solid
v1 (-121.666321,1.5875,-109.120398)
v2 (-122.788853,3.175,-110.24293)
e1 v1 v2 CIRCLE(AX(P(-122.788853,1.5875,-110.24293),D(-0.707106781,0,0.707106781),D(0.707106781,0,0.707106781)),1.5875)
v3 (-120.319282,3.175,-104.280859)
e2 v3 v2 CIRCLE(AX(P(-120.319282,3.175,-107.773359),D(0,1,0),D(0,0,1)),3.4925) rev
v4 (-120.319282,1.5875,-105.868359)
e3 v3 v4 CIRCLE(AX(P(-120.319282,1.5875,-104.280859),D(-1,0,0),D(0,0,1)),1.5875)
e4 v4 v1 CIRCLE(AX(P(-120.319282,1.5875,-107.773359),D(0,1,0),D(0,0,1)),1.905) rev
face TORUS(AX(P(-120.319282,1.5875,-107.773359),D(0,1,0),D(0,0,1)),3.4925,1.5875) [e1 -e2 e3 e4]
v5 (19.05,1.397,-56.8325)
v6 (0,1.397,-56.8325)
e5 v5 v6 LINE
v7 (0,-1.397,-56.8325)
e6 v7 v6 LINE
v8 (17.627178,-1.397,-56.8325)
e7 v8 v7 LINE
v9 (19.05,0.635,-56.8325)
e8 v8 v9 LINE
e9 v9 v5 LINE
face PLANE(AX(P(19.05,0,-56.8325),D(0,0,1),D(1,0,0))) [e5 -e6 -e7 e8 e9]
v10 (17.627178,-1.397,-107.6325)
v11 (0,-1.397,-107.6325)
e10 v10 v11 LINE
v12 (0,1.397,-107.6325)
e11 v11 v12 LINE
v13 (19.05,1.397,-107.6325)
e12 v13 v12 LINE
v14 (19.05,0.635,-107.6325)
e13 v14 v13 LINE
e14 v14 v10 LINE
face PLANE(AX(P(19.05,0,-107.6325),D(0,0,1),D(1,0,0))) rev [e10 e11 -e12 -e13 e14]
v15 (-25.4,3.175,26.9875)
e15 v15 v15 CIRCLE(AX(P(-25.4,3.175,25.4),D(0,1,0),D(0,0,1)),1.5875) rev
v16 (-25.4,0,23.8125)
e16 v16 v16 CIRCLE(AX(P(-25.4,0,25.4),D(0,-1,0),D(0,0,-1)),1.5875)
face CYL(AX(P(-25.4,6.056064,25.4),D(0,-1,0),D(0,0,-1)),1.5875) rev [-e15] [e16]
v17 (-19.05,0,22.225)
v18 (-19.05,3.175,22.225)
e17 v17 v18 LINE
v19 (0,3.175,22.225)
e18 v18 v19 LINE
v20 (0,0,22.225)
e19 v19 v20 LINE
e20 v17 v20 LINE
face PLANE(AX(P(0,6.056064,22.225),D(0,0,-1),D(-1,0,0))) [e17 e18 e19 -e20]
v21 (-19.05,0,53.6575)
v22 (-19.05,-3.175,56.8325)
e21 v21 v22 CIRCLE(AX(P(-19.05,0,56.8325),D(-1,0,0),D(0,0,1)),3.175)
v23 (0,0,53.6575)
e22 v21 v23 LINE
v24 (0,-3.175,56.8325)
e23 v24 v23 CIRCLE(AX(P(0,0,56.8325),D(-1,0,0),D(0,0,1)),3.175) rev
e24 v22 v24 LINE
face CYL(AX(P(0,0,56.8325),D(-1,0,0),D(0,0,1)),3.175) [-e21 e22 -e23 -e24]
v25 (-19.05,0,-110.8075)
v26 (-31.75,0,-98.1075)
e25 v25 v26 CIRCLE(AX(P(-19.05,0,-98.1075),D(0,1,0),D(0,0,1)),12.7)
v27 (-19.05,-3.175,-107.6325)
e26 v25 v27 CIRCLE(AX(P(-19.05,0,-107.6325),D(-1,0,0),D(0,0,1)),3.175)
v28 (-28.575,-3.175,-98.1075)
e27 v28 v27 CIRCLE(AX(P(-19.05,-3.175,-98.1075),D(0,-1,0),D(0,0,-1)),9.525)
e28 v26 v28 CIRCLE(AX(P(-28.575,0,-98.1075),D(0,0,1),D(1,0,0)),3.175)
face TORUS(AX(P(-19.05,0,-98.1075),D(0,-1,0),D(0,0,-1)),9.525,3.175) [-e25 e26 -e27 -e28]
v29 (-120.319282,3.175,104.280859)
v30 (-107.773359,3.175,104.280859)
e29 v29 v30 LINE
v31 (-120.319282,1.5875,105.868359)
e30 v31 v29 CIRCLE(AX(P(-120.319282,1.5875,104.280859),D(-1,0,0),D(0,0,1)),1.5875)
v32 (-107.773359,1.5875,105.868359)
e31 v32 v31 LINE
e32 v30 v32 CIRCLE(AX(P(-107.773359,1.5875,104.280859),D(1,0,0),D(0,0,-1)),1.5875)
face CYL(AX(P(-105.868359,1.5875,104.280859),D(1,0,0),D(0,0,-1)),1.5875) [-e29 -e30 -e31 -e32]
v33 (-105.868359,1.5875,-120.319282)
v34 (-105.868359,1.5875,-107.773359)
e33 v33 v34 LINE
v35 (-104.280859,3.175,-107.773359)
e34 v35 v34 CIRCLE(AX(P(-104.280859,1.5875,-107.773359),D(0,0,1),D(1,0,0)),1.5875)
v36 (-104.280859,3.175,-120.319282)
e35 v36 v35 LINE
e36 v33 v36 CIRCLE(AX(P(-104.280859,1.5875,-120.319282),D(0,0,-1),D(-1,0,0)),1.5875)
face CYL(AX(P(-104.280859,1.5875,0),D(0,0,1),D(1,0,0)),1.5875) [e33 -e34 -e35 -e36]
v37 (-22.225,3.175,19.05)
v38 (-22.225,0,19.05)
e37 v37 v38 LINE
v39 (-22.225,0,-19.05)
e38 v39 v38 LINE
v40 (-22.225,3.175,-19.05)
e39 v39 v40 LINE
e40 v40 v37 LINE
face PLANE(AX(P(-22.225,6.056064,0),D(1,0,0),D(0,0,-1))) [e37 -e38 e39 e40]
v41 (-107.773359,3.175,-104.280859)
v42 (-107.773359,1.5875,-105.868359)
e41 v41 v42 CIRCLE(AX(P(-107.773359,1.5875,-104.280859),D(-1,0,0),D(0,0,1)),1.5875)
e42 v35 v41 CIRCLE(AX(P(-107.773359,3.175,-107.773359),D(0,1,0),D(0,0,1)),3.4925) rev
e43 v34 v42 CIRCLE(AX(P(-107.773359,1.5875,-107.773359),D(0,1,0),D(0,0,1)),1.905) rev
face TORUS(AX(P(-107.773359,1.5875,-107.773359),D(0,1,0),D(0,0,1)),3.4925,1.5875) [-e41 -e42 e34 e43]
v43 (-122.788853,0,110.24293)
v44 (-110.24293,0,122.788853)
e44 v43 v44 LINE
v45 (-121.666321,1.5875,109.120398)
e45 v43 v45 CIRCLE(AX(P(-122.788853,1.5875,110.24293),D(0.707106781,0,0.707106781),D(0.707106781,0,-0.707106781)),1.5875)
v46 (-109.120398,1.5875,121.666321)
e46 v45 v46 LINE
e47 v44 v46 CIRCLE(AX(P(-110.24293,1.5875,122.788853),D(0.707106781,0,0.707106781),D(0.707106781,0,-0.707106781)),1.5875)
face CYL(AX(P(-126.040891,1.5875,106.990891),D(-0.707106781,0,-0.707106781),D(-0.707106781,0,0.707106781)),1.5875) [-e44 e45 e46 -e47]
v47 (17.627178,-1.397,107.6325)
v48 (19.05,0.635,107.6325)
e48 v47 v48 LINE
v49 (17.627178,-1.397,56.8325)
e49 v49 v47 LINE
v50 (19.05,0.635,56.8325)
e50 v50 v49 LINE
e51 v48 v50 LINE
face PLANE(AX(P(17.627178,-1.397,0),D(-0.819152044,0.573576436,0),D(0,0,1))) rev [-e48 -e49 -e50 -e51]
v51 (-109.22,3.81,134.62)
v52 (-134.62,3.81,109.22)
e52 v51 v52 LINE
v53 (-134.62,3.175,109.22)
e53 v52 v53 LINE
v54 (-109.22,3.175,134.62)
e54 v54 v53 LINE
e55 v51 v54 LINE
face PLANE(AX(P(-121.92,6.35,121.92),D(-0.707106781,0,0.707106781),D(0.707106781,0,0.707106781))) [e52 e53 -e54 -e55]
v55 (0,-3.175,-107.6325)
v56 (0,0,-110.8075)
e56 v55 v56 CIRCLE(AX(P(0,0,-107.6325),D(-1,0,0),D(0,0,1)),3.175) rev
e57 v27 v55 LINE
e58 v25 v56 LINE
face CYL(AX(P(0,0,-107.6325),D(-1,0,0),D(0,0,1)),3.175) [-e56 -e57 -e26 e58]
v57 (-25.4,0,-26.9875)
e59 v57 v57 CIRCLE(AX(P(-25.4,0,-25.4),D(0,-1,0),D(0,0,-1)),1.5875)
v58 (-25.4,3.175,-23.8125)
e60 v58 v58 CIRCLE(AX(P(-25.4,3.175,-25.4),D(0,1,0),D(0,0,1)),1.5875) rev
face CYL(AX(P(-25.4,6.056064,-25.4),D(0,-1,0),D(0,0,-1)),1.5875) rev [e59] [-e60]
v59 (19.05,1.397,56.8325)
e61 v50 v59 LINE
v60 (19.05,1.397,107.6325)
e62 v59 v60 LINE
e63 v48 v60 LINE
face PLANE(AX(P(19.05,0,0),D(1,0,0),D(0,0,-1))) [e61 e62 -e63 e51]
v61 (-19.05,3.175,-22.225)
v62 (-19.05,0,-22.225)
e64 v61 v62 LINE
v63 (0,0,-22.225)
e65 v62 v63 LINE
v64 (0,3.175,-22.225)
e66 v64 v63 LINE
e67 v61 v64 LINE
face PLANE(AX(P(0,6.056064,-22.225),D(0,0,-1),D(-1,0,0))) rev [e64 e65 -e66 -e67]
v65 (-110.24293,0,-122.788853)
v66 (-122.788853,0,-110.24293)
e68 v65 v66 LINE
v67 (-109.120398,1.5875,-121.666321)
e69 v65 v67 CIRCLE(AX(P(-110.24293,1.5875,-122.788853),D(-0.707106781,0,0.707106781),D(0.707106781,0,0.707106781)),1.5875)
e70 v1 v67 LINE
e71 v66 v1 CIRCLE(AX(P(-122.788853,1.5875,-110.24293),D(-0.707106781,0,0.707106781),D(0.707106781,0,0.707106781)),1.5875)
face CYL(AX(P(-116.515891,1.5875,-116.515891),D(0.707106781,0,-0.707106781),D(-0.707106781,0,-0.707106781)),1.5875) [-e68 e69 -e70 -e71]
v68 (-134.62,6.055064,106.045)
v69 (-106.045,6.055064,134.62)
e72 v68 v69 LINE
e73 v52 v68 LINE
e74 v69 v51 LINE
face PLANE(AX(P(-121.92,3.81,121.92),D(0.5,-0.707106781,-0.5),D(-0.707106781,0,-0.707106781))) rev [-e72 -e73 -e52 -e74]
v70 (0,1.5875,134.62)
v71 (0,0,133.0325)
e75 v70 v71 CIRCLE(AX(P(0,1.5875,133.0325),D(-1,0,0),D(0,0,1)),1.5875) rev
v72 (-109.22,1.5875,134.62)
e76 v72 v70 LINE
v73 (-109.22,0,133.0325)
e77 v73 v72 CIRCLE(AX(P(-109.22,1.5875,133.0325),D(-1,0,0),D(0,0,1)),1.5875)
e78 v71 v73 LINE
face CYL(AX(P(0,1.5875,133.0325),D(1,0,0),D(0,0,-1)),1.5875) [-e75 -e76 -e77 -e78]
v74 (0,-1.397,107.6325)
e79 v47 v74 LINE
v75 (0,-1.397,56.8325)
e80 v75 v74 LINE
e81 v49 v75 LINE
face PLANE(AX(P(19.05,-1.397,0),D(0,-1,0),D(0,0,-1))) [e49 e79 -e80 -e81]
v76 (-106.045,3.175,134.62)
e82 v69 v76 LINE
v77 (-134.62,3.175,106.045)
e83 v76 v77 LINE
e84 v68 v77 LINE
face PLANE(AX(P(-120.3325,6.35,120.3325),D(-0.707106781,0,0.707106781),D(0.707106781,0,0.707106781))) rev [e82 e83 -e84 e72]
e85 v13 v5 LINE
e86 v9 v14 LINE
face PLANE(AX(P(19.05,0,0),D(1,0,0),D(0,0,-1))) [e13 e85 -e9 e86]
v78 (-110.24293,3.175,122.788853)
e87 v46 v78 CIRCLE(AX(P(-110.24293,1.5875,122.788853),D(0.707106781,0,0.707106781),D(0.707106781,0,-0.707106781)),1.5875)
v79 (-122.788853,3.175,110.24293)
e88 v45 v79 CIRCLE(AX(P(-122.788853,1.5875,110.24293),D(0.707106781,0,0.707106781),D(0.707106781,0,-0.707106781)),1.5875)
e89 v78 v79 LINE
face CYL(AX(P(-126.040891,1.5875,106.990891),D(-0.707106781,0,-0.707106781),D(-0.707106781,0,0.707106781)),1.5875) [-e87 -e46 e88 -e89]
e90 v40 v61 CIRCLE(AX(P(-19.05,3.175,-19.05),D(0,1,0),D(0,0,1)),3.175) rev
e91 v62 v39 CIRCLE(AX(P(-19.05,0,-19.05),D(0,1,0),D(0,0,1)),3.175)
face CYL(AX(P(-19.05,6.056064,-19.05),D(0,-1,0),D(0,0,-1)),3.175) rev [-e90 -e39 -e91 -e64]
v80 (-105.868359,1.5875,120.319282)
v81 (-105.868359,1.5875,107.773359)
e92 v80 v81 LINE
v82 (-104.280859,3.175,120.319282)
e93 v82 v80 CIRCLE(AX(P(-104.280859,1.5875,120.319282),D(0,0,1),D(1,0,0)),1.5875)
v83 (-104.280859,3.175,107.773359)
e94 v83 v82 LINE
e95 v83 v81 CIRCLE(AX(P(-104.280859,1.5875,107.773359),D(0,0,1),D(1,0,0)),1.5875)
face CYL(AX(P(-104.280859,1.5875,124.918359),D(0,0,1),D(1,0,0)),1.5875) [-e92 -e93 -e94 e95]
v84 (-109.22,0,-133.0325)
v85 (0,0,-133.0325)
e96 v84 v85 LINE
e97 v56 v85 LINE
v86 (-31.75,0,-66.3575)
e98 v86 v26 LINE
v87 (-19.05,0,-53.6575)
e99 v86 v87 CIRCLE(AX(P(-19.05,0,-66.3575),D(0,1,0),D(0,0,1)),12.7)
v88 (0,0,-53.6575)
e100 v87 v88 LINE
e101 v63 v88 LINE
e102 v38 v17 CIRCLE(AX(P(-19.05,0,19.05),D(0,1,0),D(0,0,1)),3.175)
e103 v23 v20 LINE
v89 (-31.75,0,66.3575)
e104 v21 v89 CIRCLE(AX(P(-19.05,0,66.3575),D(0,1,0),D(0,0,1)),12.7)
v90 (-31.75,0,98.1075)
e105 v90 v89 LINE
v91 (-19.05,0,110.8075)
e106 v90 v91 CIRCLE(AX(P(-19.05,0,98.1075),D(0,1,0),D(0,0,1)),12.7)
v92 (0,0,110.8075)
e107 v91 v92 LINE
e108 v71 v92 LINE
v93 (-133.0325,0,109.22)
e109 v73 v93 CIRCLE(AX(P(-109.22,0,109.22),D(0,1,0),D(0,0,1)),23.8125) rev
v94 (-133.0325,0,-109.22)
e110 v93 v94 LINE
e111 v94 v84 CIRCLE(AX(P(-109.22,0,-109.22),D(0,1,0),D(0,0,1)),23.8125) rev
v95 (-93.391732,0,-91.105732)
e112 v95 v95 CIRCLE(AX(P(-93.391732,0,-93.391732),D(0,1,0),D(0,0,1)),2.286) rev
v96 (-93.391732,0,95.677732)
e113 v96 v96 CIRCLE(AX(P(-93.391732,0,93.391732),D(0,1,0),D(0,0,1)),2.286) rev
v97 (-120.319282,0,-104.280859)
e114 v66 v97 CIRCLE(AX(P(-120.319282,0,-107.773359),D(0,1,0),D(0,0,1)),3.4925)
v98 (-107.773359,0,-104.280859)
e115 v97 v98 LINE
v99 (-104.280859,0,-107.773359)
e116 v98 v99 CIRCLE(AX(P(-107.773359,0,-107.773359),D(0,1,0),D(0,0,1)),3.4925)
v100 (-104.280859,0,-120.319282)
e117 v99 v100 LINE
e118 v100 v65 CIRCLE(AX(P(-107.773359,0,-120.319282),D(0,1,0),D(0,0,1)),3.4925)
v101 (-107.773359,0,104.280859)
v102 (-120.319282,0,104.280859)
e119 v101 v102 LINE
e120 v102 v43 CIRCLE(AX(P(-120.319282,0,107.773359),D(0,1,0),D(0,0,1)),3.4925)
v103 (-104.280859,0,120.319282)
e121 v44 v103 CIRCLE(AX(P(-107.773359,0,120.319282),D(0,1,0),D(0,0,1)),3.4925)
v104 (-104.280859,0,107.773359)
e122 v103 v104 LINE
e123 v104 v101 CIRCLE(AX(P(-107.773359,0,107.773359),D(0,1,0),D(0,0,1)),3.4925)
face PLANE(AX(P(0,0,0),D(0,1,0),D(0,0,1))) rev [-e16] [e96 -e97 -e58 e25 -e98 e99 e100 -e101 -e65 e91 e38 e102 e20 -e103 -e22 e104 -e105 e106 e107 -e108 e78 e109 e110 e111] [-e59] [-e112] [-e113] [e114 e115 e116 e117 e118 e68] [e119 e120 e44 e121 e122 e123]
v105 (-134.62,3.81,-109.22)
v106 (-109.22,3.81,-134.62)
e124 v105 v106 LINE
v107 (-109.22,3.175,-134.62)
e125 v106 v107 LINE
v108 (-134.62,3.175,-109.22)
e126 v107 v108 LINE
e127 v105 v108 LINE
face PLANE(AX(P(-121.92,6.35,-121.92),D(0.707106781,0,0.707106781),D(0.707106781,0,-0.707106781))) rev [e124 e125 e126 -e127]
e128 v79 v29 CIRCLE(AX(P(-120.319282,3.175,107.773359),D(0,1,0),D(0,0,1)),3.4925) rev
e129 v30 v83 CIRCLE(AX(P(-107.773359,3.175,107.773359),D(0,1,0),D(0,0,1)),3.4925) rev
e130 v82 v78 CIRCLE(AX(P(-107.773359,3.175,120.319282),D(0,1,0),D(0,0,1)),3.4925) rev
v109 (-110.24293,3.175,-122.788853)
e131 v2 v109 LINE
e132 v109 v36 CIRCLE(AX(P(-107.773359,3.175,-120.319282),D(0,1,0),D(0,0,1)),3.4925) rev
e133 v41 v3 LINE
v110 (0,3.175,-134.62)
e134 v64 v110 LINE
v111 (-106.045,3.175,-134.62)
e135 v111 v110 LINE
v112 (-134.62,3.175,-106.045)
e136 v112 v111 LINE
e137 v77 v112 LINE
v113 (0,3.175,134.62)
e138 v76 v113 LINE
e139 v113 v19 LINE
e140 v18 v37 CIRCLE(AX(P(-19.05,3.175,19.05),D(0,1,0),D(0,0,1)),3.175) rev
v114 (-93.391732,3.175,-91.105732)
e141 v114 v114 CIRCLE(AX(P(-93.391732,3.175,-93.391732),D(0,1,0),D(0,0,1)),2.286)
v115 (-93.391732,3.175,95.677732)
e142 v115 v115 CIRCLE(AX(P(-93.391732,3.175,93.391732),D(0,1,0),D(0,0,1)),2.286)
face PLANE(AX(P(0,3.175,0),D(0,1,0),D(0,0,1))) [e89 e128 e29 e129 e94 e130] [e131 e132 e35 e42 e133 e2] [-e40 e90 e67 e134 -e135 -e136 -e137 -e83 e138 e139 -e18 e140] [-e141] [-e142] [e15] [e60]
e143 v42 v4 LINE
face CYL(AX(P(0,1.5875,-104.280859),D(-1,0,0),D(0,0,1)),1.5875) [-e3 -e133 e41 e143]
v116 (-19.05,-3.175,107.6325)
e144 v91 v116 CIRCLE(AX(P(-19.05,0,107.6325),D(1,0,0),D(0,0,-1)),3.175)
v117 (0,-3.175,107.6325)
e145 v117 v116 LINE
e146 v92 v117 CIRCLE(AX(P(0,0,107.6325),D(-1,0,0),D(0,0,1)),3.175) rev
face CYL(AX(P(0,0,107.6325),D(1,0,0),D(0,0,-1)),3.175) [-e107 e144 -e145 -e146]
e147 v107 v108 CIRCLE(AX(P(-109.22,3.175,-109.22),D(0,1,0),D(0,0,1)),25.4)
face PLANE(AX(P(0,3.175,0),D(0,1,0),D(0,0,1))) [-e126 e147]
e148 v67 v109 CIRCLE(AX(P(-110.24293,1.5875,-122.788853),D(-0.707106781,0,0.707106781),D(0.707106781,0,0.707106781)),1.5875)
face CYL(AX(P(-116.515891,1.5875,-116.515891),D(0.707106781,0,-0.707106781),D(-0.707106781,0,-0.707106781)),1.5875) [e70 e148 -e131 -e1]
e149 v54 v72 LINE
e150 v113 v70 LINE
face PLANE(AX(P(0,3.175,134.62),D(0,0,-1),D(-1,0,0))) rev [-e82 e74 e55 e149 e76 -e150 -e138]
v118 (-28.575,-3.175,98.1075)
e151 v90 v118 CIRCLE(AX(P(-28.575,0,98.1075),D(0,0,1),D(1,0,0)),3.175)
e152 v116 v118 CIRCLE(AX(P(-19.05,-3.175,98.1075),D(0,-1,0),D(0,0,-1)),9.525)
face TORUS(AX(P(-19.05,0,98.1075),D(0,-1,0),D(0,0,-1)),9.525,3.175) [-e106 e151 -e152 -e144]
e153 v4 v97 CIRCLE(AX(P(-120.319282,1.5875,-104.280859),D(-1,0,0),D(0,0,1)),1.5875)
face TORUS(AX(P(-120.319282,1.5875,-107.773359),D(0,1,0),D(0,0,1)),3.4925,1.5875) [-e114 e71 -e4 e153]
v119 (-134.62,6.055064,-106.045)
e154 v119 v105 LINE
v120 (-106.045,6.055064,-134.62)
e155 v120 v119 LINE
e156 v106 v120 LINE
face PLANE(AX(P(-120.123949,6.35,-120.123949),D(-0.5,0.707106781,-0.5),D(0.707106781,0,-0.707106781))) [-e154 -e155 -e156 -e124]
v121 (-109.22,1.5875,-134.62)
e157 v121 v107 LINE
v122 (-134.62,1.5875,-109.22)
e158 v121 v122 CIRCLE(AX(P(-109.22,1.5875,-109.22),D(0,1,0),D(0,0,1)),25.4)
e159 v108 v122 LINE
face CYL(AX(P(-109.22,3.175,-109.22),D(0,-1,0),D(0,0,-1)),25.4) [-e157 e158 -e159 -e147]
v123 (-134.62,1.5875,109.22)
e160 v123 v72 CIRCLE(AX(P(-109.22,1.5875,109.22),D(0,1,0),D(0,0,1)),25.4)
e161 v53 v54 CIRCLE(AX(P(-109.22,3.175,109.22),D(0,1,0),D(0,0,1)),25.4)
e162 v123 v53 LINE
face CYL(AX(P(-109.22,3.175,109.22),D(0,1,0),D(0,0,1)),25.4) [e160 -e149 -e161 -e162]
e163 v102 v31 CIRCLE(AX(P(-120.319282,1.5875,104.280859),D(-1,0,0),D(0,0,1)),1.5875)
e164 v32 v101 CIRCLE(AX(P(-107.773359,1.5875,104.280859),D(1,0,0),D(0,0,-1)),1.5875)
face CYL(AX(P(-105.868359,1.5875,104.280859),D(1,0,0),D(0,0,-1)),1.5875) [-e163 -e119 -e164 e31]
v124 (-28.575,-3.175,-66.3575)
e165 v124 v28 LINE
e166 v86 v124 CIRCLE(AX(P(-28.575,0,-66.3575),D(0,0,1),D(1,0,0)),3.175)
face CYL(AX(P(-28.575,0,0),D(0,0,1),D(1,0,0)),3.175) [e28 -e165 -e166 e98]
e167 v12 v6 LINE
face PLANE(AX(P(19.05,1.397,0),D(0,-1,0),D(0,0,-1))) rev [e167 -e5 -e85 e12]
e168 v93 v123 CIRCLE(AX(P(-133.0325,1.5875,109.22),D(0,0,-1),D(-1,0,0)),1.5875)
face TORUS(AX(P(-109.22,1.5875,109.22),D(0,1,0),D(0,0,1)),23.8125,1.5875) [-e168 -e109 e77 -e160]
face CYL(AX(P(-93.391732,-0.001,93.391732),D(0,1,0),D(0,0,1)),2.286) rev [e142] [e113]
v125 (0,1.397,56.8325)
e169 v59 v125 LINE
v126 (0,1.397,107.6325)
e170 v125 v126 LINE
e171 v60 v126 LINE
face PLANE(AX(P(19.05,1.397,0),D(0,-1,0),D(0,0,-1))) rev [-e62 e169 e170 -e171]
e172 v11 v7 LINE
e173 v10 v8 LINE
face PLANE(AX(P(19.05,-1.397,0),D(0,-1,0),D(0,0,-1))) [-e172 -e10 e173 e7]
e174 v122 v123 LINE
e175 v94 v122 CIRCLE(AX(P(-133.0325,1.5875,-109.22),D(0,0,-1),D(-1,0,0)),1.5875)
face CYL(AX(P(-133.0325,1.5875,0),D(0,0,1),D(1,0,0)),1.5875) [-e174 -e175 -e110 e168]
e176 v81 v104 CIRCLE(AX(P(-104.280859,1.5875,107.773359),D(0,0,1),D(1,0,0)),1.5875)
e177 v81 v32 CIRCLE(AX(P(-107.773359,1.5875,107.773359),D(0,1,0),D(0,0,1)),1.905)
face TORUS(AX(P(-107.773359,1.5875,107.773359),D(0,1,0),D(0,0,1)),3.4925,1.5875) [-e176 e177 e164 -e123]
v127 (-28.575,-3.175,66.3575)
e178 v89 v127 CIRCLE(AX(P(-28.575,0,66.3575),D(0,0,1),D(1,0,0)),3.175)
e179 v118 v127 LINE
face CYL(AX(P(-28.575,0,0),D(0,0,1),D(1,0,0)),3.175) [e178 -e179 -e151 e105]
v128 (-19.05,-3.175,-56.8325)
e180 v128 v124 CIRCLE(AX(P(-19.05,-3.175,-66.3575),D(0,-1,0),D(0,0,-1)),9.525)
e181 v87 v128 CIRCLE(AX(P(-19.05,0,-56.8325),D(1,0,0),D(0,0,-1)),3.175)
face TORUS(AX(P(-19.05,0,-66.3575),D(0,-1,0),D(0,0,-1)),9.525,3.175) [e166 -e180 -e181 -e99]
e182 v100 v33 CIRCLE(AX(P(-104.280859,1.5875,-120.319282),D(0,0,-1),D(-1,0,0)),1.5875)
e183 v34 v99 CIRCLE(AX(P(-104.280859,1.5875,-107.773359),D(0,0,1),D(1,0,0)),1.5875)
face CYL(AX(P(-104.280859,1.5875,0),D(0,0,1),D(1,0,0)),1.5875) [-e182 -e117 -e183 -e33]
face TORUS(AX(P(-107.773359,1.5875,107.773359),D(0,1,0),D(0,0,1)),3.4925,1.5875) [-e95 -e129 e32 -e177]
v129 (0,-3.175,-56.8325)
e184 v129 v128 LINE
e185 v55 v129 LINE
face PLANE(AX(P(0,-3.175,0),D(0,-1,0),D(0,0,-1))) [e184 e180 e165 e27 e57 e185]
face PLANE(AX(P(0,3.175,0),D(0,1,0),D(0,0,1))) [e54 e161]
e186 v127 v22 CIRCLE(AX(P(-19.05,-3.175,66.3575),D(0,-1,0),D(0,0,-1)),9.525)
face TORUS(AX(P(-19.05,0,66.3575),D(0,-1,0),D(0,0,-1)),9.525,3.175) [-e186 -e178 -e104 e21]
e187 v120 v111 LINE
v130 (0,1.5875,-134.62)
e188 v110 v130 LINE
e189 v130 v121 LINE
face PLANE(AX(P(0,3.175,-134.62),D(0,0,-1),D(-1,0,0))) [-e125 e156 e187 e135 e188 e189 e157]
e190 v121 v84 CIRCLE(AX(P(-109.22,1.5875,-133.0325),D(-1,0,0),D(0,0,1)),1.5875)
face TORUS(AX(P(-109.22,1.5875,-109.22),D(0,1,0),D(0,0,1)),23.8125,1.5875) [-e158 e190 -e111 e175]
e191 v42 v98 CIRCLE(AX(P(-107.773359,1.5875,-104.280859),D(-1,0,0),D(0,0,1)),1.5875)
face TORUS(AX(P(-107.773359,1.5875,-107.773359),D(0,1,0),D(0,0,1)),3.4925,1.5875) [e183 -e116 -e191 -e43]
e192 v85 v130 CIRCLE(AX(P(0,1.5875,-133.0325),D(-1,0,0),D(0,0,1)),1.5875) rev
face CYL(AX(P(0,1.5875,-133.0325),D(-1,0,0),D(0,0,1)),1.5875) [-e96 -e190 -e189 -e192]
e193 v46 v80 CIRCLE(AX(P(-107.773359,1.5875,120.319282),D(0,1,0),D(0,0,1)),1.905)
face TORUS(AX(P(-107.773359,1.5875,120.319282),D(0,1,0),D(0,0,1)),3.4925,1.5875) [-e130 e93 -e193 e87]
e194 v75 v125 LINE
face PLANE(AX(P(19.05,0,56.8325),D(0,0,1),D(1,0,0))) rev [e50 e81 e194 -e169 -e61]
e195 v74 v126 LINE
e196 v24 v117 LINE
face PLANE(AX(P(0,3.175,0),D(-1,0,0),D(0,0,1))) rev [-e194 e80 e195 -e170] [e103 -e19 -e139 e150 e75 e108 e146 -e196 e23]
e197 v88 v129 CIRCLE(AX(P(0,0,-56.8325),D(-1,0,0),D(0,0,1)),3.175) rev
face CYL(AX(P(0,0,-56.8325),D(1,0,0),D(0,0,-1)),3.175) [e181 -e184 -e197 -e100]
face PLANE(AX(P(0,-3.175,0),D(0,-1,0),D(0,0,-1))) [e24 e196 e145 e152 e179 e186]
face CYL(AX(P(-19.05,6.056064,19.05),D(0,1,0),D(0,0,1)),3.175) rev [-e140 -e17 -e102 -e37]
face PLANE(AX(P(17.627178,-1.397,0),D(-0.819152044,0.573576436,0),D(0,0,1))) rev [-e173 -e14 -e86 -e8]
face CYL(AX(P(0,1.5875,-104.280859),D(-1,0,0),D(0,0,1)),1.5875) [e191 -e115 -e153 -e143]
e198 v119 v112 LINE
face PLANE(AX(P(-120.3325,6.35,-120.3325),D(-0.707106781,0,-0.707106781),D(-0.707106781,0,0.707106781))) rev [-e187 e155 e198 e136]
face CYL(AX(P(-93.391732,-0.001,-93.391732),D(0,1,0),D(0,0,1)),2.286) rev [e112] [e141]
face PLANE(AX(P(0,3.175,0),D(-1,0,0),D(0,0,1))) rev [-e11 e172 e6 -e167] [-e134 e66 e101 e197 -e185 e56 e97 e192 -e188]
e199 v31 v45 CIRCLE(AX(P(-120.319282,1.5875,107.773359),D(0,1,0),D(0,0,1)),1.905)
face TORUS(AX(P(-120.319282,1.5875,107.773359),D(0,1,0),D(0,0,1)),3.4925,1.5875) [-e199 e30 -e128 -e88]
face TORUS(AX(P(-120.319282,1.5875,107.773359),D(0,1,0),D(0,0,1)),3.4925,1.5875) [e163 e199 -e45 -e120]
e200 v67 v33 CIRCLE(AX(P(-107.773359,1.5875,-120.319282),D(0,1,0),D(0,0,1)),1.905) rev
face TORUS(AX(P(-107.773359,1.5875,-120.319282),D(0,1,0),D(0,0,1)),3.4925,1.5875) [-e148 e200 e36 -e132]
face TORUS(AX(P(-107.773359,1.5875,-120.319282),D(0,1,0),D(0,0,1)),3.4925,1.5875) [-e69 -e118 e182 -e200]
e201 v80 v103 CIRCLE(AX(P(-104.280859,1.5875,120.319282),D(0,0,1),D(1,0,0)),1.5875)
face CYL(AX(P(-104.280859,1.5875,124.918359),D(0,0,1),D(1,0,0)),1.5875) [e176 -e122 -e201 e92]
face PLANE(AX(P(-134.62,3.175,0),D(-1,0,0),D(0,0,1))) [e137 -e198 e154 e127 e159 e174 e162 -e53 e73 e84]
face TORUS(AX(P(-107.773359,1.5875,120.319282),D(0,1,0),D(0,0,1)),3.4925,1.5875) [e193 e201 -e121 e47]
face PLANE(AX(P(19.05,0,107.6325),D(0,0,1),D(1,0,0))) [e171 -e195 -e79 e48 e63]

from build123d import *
from OCP.BRepFilletAPI import BRepFilletAPI_MakeChamfer

# Parameters (mm, degrees)
SKETCH1_W           = 134.62
SKETCH1_H           = 269.24
BOSS_EXTRUDE1_DEPTH = 3.175
BOSS_EXTRUDE2_DEPTH = 3.175
CUT_EXTRUDE1_REACH  = 192.408
SKETCH2_3_R         = 2.286
CHAMFER1_SIZE       = 2.54
FILLET1_R           = 1.905
FILLET2_R           = 1.5875
FILLET3_R           = 25.4
FILLET4_R           = 1.5875
SKETCH3_W           = 31.75
SKETCH3_H           = 57.15
BOSS_EXTRUDE3_DEPTH = 3.175
SKETCH4_W           = 50.8
SKETCH4_H           = 2.794
BOSS_EXTRUDE4_DEPTH = 19.05
FILLET5_R           = 12.7
FILLET6_R           = 3.175
CUT_EXTRUDE2_REACH  = 192.478
SKETCH5_W           = 22.225
SKETCH5_H           = 44.45
SKETCH5_R           = 1.5875
FILLET7_R           = 3.175
CHAMFER2_SIZE       = 2.032
CHAMFER2_SIZE2      = 1.422821718


# Some blends are built 0.0001 mm under size
with BuildPart() as part:
    # Sketch1 → Boss-Extrude1 (new body)
    with BuildSketch(Plane(origin=(0, 0, 0), x_dir=(1, 0, 0), z_dir=(0, 1, 0))):
        with Locations((-67.31, 0)):
            Rectangle(SKETCH1_W, SKETCH1_H)
    extrude(amount=BOSS_EXTRUDE1_DEPTH)

    # Sketch2 → Boss-Extrude2 (add)
    with BuildSketch(Plane(origin=(0, 3.175, 0), x_dir=(1, 0, 0), z_dir=(0, 1, 0))):
        Polygon((-134.62, 109.22), (-134.62, 106.045), (-120.3325, 120.3325), (-106.045, 134.62), (-109.22, 134.62), align=None)
        Polygon((-134.62, -109.22), (-109.22, -134.62), (-106.045, -134.62), (-120.3325, -120.3325), (-134.62, -106.045), align=None)
    extrude(amount=BOSS_EXTRUDE2_DEPTH)

    # Sketch2<3> → Cut-Extrude1 (cut, up to next)
    with BuildSketch(Plane(origin=(0, 3.175, 0), x_dir=(1, 0, 0), z_dir=(0, 1, 0)), mode=Mode.PRIVATE) as cut_extrude1_sk1:
        with Locations(Location((-93.391731637, 93.391731637, 0), (0, 0, 270))):
            Circle(SKETCH2_3_R)
    cut_extrude1_tool1 = extrude(cut_extrude1_sk1.sketch, amount=-CUT_EXTRUDE1_REACH, mode=Mode.PRIVATE) & part.part
    # Sketch2<3> → Cut-Extrude1 (cut, up to next)
    with BuildSketch(Plane(origin=(0, 3.175, 0), x_dir=(1, 0, 0), z_dir=(0, 1, 0)), mode=Mode.PRIVATE) as cut_extrude1_sk2:
        with Locations(Location((-93.391731637, -93.391731637, 0), (0, 0, 270))):
            Circle(SKETCH2_3_R)
    cut_extrude1_tool2 = extrude(cut_extrude1_sk2.sketch, amount=-CUT_EXTRUDE1_REACH, mode=Mode.PRIVATE) & part.part
    # Sketch2<3> → Cut-Extrude1 (cut, up to next)
    with BuildSketch(Plane(origin=(0, 3.175, 0), x_dir=(1, 0, 0), z_dir=(0, 1, 0)), mode=Mode.PRIVATE) as cut_extrude1_sk3:
        Polygon((-124.918359133, -105.868359133), (-105.868359133, -124.918359133), (-105.868359133, -105.868359133), align=None)
    cut_extrude1_tool3 = extrude(cut_extrude1_sk3.sketch, amount=-CUT_EXTRUDE1_REACH, mode=Mode.PRIVATE) & part.part
    # Sketch2<3> → Cut-Extrude1 (cut, up to next)
    with BuildSketch(Plane(origin=(0, 3.175, 0), x_dir=(1, 0, 0), z_dir=(0, 1, 0)), mode=Mode.PRIVATE) as cut_extrude1_sk4:
        Polygon((-124.918359133, 105.868359133), (-105.868359133, 124.918359133), (-105.868359133, 105.868359133), align=None)
    cut_extrude1_tool4 = extrude(cut_extrude1_sk4.sketch, amount=-CUT_EXTRUDE1_REACH, mode=Mode.PRIVATE) & part.part
    add(cut_extrude1_tool1.solids().sort_by_distance((-93.391732, 3.175, -93.391732))[0], mode=Mode.SUBTRACT)
    add(cut_extrude1_tool2.solids().sort_by_distance((-93.391732, 3.175, 93.391732))[0], mode=Mode.SUBTRACT)
    add(cut_extrude1_tool3.solids().sort_by_distance((-112.218359, 3.175, 112.218359))[0], mode=Mode.SUBTRACT)
    add(cut_extrude1_tool4.solids().sort_by_distance((-112.218359, 3.175, -112.218359))[0], mode=Mode.SUBTRACT)

    # Chamfer1
    # the kernel refuses this chamfer: 2.54 mm, written as the material it takes off along each edge
    with BuildSketch(Plane(origin=(-104.601125621, 6.35, -139.238874379), x_dir=(0.7068394360706735, 0.027495876610586185, 0.7068394360706735), z_dir=(-0.7071067811865476, 0, 0.7071067811865476))) as chamfer1_piece_1:
        Polygon((CHAMFER1_SIZE * 0.999621916911, -CHAMFER1_SIZE * 0.0274958766106), (-CHAMFER1_SIZE * 0.0274958766106, -CHAMFER1_SIZE * 0.999621916911), (0, 0), align=None)
    extrude(amount=48.985174063, mode=Mode.SUBTRACT)
    with BuildSketch(Plane(origin=(-139.238874379, 6.35, 104.601125621), x_dir=(-0.019442520806012394, -0.9996219169112968, 0.019442520806012414), z_dir=(0.7071067811865479, 0, 0.7071067811865471))) as chamfer1_piece_2:
        Polygon((CHAMFER1_SIZE * 0.999621916911, CHAMFER1_SIZE * 0.0274958766106), (-CHAMFER1_SIZE * 0.0274958766106, CHAMFER1_SIZE * 0.999621916911), (0, 0), align=None)
    extrude(amount=48.985174063, mode=Mode.SUBTRACT)

    # Fillet1
    fillet1_edges = [part.edges().sort_by_distance(p)[0] for p in [
        (-105.868359133, 1.5875, -124.918359133),
        (-105.868359133, 1.5875, -105.868359133),
        (-124.918359133, 1.5875, -105.868359133),
        (-105.868359133, 1.5875, 124.918359133),
        (-124.918359133, 1.5875, 105.868359133),
        (-105.868359133, 1.5875, 105.868359133),
    ]]
    fillet(fillet1_edges, radius=FILLET1_R)

    # Fillet2
    fillet2_edges = [part.edges().sort_by_distance(p)[0] for p in [
        (-107.044347195, 0, 122.079272807),
        (-105.868359133, 0, 114.046320715),
        (-106.426320715, 0, 106.426320715),
        (-114.046320715, 0, 105.868359133),
        (-122.079272807, 0, 107.044347195),
        (-122.079272807, 3.175, 107.044347195),
        (-114.046320715, 3.175, 105.868359133),
        (-106.426320715, 3.175, 106.426320715),
        (-105.868359133, 3.175, 114.046320715),
        (-107.044347195, 3.175, 122.079272807),
        (-122.079272807, 3.175, -107.044347195),
        (-114.046320715, 3.175, -105.868359133),
        (-106.426320715, 3.175, -106.426320715),
        (-105.868359133, 3.175, -114.046320715),
        (-107.044347195, 3.175, -122.079272807),
        (-107.044347195, 0, -122.079272807),
        (-105.868359133, 0, -114.046320715),
        (-106.426320715, 0, -106.426320715),
        (-114.046320715, 0, -105.868359133),
        (-122.079272807, 0, -107.044347195),
        (-115.393359133, 0, 115.393359133),
        (-115.393359133, 3.175, 115.393359133),
        (-115.393359133, 3.175, -115.393359133),
        (-115.393359133, 0, -115.393359133),
    ]]
    fillet(fillet2_edges, radius=FILLET2_R - 0.0001)  # a hair under: the kernel refuses the full size

    # Fillet3
    fillet3_edges = [part.edges().sort_by_distance(p)[0] for p in [
        (-134.62, 1.5875, 134.62),
        (-134.62, 1.5875, -134.62),
    ]]
    fillet(fillet3_edges, radius=FILLET3_R)

    # Fillet4
    fillet4_edges = [part.edges().sort_by_distance(p)[0] for p in [
        (-54.61, 0, 134.62),
        (-54.61, 0, -134.62),
        (-134.62, 0, 0),
        (-127.180512242, 0, -127.180512242),
        (-127.180512242, 0, 127.180512242),
    ]]
    fillet(fillet4_edges, radius=FILLET4_R)

    # Sketch3 → Boss-Extrude3 (add)
    with BuildSketch(Plane.XZ):
        with Locations((-15.875, 82.2325)):
            Rectangle(SKETCH3_W, SKETCH3_H)
        with Locations((-15.875, -82.2325)):
            Rectangle(SKETCH3_W, SKETCH3_H)
    extrude(amount=BOSS_EXTRUDE3_DEPTH)

    # Sketch4 → Boss-Extrude4 (add)
    with BuildSketch(Plane(origin=(0, 0, 0), x_dir=(0, 0, -1), z_dir=(1, 0, 0))):
        with Locations((-82.2325, 0)):
            Rectangle(SKETCH4_W, SKETCH4_H)
        with Locations((82.2325, 0)):
            Rectangle(SKETCH4_W, SKETCH4_H)
    extrude(amount=BOSS_EXTRUDE4_DEPTH)

    # Fillet5
    fillet5_edges = [part.edges().sort_by_distance(p)[0] for p in [
        (-31.75, -1.5875, 110.8075),
        (-31.75, -1.5875, 53.6575),
        (-31.75, -1.5875, -53.6575),
        (-31.75, -1.5875, -110.8075),
    ]]
    fillet(fillet5_edges, radius=FILLET5_R)

    # Fillet6
    fillet6_edges = [part.edges().sort_by_distance(p)[0] for p in [
        (-9.525, -3.175, -53.6575),
        (-28.030256121, -3.175, -57.377243879),
        (-31.75, -3.175, -82.2325),
        (-28.030256121, -3.175, -107.087756121),
        (-9.525, -3.175, 110.8075),
        (-28.030256121, -3.175, 107.087756121),
        (-31.75, -3.175, 82.2325),
        (-28.030256121, -3.175, 57.377243879),
        (-9.525, -3.175, -110.8075),
        (-9.525, -3.175, 53.6575),
    ]]
    fillet(fillet6_edges, radius=FILLET6_R - 0.0001)  # a hair under: the kernel refuses the full size

    # Sketch5 → Cut-Extrude2 (cut, up to next)
    with BuildSketch(Plane.XZ, mode=Mode.PRIVATE) as cut_extrude2_sk1:
        with Locations((-11.1125, 0)):
            Rectangle(SKETCH5_W, SKETCH5_H)
    cut_extrude2_tool1 = extrude(cut_extrude2_sk1.sketch, amount=-CUT_EXTRUDE2_REACH, mode=Mode.PRIVATE) & part.part
    # Sketch5 → Cut-Extrude2 (cut, up to next)
    with BuildSketch(Plane.XZ, mode=Mode.PRIVATE) as cut_extrude2_sk2:
        with Locations(Location((-25.4, 25.4, 0), (0, 0, 270))):
            Circle(SKETCH5_R)
    cut_extrude2_tool2 = extrude(cut_extrude2_sk2.sketch, amount=-CUT_EXTRUDE2_REACH, mode=Mode.PRIVATE) & part.part
    # Sketch5 → Cut-Extrude2 (cut, up to next)
    with BuildSketch(Plane.XZ, mode=Mode.PRIVATE) as cut_extrude2_sk3:
        with Locations(Location((-25.4, -25.4, 0), (0, 0, 270))):
            Circle(SKETCH5_R)
    cut_extrude2_tool3 = extrude(cut_extrude2_sk3.sketch, amount=-CUT_EXTRUDE2_REACH, mode=Mode.PRIVATE) & part.part
    add(cut_extrude2_tool1.solids().sort_by_distance((-11.1125, 0, 0))[0], mode=Mode.SUBTRACT)
    add(cut_extrude2_tool2.solids().sort_by_distance((-25.4, 0, 25.4))[0], mode=Mode.SUBTRACT)
    add(cut_extrude2_tool3.solids().sort_by_distance((-25.4, 0, -25.4))[0], mode=Mode.SUBTRACT)

    # Fillet7
    fillet7_edges = [part.edges().sort_by_distance(p)[0] for p in [
        (-22.225, 1.5875, 22.225),
        (-22.225, 1.5875, -22.225),
    ]]
    fillet(fillet7_edges, radius=FILLET7_R)

    # Chamfer2: one chamfer whose edges measure the first distance from different faces: ONE call of the kernel's chamfer builder (chamfer() names one face for all edges)
    chamfer2_edges_1 = [part.edges().sort_by_distance(p)[0] for p in [
        (19.05, -1.397, 82.2325),
    ]]
    chamfer2_side_1 = [part.faces().sort_by_distance(p)[0] for p in [
        (19.05, 0, 82.2325),
    ]]
    chamfer2_edges_2 = [part.edges().sort_by_distance(p)[0] for p in [
        (19.05, -1.397, -82.2325),
    ]]
    chamfer2_side_2 = [part.faces().sort_by_distance(p)[0] for p in [
        (19.05, 0, -82.2325),
    ]]
    chamfer2 = BRepFilletAPI_MakeChamfer(part.part.solid().wrapped)
    for e in chamfer2_edges_1:
        chamfer2.Add(CHAMFER2_SIZE, CHAMFER2_SIZE2, e.wrapped, chamfer2_side_1[0].wrapped)  # the first distance lies on this face
    for e in chamfer2_edges_2:
        chamfer2.Add(CHAMFER2_SIZE, CHAMFER2_SIZE2, e.wrapped, chamfer2_side_2[0].wrapped)  # the first distance lies on this face
    add(Compound.cast(chamfer2.Shape()), mode=Mode.REPLACE)


solid = part.part
